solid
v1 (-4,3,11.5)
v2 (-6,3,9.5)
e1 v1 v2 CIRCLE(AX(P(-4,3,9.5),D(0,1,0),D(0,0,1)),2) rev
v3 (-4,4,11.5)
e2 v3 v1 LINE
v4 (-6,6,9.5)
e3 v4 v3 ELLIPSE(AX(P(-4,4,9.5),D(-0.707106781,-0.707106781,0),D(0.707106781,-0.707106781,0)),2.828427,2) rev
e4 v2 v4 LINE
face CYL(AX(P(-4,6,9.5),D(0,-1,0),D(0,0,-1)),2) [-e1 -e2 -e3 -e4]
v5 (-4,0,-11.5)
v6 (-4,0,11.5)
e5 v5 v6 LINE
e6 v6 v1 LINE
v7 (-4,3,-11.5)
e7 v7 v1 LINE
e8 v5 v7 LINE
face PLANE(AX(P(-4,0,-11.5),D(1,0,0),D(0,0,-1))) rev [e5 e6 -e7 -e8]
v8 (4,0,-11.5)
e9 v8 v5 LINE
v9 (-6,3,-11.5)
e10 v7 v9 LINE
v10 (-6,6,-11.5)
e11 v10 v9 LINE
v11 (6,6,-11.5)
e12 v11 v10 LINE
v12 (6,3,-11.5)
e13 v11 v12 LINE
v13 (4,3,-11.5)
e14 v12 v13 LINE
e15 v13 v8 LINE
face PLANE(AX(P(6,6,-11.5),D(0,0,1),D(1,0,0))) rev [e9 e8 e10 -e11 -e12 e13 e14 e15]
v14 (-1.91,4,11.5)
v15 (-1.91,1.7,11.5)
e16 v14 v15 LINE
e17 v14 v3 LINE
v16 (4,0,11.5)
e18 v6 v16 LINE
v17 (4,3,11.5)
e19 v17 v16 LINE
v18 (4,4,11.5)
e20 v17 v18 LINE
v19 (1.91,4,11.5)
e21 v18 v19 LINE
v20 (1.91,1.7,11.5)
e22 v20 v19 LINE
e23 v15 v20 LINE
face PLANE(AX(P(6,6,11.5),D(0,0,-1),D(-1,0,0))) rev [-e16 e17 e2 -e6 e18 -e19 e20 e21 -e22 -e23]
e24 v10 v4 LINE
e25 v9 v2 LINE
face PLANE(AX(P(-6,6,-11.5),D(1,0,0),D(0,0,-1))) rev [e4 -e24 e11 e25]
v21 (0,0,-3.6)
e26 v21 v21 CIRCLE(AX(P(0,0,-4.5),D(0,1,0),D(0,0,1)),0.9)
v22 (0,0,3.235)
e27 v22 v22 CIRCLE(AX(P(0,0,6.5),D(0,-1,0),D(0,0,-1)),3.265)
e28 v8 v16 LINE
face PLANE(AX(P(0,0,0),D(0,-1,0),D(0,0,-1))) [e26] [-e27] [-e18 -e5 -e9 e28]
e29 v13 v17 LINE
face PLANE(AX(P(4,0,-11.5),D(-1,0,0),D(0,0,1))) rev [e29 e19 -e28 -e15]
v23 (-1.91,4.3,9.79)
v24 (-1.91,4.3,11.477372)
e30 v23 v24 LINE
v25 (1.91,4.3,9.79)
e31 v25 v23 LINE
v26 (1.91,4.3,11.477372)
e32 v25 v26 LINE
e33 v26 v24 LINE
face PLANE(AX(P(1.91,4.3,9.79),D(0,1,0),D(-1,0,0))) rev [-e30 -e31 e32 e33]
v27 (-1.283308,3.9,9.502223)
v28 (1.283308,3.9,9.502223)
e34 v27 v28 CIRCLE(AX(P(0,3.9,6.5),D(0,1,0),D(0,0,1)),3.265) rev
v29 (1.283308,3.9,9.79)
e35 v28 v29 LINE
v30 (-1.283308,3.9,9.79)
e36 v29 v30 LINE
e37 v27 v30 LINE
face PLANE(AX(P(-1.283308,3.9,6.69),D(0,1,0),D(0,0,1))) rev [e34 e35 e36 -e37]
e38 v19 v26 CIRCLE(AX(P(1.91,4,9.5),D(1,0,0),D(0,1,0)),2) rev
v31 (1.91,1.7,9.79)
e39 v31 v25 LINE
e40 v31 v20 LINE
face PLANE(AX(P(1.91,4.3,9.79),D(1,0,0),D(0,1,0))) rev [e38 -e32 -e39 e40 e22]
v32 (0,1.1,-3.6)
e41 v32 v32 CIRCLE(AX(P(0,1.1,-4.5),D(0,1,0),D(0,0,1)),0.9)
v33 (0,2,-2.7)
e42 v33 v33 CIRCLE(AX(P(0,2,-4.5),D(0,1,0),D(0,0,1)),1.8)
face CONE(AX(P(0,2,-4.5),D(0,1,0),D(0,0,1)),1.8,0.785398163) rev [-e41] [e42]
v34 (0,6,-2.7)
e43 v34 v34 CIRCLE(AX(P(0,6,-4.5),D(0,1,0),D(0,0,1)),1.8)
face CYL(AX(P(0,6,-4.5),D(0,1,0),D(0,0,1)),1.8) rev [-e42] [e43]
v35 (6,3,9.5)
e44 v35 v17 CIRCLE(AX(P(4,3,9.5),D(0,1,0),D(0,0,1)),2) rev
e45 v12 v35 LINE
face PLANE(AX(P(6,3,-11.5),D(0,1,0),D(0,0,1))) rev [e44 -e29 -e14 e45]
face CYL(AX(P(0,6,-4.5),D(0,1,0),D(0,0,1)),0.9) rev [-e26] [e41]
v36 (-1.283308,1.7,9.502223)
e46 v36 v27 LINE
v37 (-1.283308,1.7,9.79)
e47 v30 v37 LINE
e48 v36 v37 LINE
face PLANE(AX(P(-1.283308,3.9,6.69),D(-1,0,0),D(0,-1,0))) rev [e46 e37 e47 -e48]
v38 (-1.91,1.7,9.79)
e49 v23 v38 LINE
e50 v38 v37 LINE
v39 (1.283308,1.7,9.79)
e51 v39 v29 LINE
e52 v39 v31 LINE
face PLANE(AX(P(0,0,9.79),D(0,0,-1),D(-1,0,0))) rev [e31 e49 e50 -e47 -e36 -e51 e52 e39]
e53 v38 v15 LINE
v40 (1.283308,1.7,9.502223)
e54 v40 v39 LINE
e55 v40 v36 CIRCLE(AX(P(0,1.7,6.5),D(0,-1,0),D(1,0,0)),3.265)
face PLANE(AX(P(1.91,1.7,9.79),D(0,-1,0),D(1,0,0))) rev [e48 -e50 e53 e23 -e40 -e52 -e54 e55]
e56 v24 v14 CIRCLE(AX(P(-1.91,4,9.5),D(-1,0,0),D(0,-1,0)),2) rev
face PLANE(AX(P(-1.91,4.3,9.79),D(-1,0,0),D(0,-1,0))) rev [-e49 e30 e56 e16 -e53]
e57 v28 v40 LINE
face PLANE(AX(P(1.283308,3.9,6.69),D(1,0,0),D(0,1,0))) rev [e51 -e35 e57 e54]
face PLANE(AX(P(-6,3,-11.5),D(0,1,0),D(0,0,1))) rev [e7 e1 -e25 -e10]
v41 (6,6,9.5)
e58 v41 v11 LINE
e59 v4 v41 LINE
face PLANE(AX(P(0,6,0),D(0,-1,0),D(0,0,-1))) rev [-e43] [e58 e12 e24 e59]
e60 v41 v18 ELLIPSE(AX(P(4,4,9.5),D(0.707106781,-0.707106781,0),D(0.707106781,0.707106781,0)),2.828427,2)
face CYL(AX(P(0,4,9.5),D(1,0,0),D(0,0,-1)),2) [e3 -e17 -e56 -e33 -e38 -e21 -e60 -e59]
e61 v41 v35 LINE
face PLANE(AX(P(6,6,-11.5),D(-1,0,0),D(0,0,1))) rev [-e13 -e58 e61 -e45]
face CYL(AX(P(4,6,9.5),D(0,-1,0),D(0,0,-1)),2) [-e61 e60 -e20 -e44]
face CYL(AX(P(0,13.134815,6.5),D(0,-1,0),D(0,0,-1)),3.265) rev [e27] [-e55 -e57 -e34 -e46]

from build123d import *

# Parameters (mm, degrees)
SKETCH1_W           = 12
SKETCH1_H           = 23
BOSS_EXTRUDE1_DEPTH = 6
SKETCH2_W           = 2
SKETCH2_H           = 3
CUT_EXTRUDE1_DEPTH  = 25.515301344
SKETCH3_W           = 3.82
SKETCH3_H           = 2.6
CUT_EXTRUDE2_DEPTH  = 1.71
SKETCH4_W           = 2.566615902
SKETCH4_H           = 2.2
CUT_EXTRUDE3_DEPTH  = 3.1
CUT_EXTRUDE4_REACH  = 16.292
SKETCH5_R           = 3.265
FILLET1_R           = 2


with BuildPart() as part:
    # Sketch1 → Boss-Extrude1 (new body)
    with BuildSketch(Plane(origin=(0, 0, 0), x_dir=(1, 0, 0), z_dir=(0, 1, 0))):
        Rectangle(SKETCH1_W, SKETCH1_H)
    extrude(amount=BOSS_EXTRUDE1_DEPTH)

    # Sketch2 → Cut-Extrude1 (cut, through all)
    with BuildSketch(Plane.XY.offset(11.5)):
        with Locations((5, 1.5)):
            Rectangle(SKETCH2_W, SKETCH2_H)
        with Locations((-5, 1.5)):
            Rectangle(SKETCH2_W, SKETCH2_H)
    extrude(amount=-CUT_EXTRUDE1_DEPTH, mode=Mode.SUBTRACT)

    # Sketch3 → Cut-Extrude2 (cut)
    with BuildSketch(Plane.XY.offset(11.5)):
        with Locations((0, 3)):
            Rectangle(SKETCH3_W, SKETCH3_H)
    extrude(amount=-CUT_EXTRUDE2_DEPTH, mode=Mode.SUBTRACT)

    # Sketch4 → Cut-Extrude3 (cut)
    with BuildSketch(Plane.XY.offset(9.79)):
        with Locations((0, 2.8)):
            Rectangle(SKETCH4_W, SKETCH4_H)
    extrude(amount=-CUT_EXTRUDE3_DEPTH, mode=Mode.SUBTRACT)

    # Cut-Extrude4: up to this face of the body (flat: up to its plane)
    cut_extrude4_end = Plane(part.part.faces().sort_by_distance((0, 3.9, 8.24))[0])
    # Sketch5 → Cut-Extrude4 (cut, up to the picked face)
    with BuildSketch(Plane.XZ, mode=Mode.PRIVATE) as cut_extrude4_sk1:
        with Locations(Location((0, 6.5, 0), (0, 0, 270))):
            Circle(SKETCH5_R)
    cut_extrude4_tool1 = split(extrude(cut_extrude4_sk1.sketch, amount=-CUT_EXTRUDE4_REACH, mode=Mode.PRIVATE), bisect_by=cut_extrude4_end, keep=Keep.BOTH, mode=Mode.PRIVATE)
    add(cut_extrude4_tool1.solids().sort_by(Axis((0, 0, 6.5), (0, 1, 0)))[0], mode=Mode.SUBTRACT)

    # Fillet1
    # the kernel refuses this fillet: 2 mm, written as the material it takes off along each edge
    with BuildSketch(Plane(origin=(6, -2, 11.5), x_dir=(0, 0, -1), z_dir=(0, 1, 0))) as fillet1_piece_1:
        with BuildLine():
            CenterArc((FILLET1_R, FILLET1_R), FILLET1_R, 180, 90)
            Line((0, FILLET1_R), (0, 0))
            Line((0, 0), (FILLET1_R, 0))
        make_face()
    extrude(amount=13, mode=Mode.SUBTRACT)
    with BuildSketch(Plane(origin=(-11, 6, 11.5), x_dir=(0, 0, -1), z_dir=(1, 0, 0))) as fillet1_piece_2:
        with BuildLine():
            CenterArc((FILLET1_R, -FILLET1_R), FILLET1_R, 90, 90)
            Line((0, -FILLET1_R), (0, 0))
            Line((0, 0), (FILLET1_R, 0))
        make_face()
    extrude(amount=22, mode=Mode.SUBTRACT)
    with BuildSketch(Plane(origin=(-6, -2, 11.5), x_dir=(0, 0, -1), z_dir=(0, 1, 0))) as fillet1_piece_3:
        with BuildLine():
            CenterArc((FILLET1_R, -FILLET1_R), FILLET1_R, 90, 90)
            Line((0, -FILLET1_R), (0, 0))
            Line((0, 0), (FILLET1_R, 0))
        make_face()
    extrude(amount=13, mode=Mode.SUBTRACT)

    # Sketch7 → CSK SLOT for M1.6 Countersunk Flat Head Screw1 (revolve, cut)
    with BuildSketch(Plane(origin=(0, 6, -4.5), x_dir=(0, 0, 1), z_dir=(1, 0, 0))):
        Polygon((0, 0), (0, 6), (0.9, 6), (0.9, 4.9), (1.8, 4), (1.8, 0), align=None)
    revolve(axis=Axis((0, 12.35, -4.5), (0, -1, 0)), mode=Mode.SUBTRACT)


solid = part.part
